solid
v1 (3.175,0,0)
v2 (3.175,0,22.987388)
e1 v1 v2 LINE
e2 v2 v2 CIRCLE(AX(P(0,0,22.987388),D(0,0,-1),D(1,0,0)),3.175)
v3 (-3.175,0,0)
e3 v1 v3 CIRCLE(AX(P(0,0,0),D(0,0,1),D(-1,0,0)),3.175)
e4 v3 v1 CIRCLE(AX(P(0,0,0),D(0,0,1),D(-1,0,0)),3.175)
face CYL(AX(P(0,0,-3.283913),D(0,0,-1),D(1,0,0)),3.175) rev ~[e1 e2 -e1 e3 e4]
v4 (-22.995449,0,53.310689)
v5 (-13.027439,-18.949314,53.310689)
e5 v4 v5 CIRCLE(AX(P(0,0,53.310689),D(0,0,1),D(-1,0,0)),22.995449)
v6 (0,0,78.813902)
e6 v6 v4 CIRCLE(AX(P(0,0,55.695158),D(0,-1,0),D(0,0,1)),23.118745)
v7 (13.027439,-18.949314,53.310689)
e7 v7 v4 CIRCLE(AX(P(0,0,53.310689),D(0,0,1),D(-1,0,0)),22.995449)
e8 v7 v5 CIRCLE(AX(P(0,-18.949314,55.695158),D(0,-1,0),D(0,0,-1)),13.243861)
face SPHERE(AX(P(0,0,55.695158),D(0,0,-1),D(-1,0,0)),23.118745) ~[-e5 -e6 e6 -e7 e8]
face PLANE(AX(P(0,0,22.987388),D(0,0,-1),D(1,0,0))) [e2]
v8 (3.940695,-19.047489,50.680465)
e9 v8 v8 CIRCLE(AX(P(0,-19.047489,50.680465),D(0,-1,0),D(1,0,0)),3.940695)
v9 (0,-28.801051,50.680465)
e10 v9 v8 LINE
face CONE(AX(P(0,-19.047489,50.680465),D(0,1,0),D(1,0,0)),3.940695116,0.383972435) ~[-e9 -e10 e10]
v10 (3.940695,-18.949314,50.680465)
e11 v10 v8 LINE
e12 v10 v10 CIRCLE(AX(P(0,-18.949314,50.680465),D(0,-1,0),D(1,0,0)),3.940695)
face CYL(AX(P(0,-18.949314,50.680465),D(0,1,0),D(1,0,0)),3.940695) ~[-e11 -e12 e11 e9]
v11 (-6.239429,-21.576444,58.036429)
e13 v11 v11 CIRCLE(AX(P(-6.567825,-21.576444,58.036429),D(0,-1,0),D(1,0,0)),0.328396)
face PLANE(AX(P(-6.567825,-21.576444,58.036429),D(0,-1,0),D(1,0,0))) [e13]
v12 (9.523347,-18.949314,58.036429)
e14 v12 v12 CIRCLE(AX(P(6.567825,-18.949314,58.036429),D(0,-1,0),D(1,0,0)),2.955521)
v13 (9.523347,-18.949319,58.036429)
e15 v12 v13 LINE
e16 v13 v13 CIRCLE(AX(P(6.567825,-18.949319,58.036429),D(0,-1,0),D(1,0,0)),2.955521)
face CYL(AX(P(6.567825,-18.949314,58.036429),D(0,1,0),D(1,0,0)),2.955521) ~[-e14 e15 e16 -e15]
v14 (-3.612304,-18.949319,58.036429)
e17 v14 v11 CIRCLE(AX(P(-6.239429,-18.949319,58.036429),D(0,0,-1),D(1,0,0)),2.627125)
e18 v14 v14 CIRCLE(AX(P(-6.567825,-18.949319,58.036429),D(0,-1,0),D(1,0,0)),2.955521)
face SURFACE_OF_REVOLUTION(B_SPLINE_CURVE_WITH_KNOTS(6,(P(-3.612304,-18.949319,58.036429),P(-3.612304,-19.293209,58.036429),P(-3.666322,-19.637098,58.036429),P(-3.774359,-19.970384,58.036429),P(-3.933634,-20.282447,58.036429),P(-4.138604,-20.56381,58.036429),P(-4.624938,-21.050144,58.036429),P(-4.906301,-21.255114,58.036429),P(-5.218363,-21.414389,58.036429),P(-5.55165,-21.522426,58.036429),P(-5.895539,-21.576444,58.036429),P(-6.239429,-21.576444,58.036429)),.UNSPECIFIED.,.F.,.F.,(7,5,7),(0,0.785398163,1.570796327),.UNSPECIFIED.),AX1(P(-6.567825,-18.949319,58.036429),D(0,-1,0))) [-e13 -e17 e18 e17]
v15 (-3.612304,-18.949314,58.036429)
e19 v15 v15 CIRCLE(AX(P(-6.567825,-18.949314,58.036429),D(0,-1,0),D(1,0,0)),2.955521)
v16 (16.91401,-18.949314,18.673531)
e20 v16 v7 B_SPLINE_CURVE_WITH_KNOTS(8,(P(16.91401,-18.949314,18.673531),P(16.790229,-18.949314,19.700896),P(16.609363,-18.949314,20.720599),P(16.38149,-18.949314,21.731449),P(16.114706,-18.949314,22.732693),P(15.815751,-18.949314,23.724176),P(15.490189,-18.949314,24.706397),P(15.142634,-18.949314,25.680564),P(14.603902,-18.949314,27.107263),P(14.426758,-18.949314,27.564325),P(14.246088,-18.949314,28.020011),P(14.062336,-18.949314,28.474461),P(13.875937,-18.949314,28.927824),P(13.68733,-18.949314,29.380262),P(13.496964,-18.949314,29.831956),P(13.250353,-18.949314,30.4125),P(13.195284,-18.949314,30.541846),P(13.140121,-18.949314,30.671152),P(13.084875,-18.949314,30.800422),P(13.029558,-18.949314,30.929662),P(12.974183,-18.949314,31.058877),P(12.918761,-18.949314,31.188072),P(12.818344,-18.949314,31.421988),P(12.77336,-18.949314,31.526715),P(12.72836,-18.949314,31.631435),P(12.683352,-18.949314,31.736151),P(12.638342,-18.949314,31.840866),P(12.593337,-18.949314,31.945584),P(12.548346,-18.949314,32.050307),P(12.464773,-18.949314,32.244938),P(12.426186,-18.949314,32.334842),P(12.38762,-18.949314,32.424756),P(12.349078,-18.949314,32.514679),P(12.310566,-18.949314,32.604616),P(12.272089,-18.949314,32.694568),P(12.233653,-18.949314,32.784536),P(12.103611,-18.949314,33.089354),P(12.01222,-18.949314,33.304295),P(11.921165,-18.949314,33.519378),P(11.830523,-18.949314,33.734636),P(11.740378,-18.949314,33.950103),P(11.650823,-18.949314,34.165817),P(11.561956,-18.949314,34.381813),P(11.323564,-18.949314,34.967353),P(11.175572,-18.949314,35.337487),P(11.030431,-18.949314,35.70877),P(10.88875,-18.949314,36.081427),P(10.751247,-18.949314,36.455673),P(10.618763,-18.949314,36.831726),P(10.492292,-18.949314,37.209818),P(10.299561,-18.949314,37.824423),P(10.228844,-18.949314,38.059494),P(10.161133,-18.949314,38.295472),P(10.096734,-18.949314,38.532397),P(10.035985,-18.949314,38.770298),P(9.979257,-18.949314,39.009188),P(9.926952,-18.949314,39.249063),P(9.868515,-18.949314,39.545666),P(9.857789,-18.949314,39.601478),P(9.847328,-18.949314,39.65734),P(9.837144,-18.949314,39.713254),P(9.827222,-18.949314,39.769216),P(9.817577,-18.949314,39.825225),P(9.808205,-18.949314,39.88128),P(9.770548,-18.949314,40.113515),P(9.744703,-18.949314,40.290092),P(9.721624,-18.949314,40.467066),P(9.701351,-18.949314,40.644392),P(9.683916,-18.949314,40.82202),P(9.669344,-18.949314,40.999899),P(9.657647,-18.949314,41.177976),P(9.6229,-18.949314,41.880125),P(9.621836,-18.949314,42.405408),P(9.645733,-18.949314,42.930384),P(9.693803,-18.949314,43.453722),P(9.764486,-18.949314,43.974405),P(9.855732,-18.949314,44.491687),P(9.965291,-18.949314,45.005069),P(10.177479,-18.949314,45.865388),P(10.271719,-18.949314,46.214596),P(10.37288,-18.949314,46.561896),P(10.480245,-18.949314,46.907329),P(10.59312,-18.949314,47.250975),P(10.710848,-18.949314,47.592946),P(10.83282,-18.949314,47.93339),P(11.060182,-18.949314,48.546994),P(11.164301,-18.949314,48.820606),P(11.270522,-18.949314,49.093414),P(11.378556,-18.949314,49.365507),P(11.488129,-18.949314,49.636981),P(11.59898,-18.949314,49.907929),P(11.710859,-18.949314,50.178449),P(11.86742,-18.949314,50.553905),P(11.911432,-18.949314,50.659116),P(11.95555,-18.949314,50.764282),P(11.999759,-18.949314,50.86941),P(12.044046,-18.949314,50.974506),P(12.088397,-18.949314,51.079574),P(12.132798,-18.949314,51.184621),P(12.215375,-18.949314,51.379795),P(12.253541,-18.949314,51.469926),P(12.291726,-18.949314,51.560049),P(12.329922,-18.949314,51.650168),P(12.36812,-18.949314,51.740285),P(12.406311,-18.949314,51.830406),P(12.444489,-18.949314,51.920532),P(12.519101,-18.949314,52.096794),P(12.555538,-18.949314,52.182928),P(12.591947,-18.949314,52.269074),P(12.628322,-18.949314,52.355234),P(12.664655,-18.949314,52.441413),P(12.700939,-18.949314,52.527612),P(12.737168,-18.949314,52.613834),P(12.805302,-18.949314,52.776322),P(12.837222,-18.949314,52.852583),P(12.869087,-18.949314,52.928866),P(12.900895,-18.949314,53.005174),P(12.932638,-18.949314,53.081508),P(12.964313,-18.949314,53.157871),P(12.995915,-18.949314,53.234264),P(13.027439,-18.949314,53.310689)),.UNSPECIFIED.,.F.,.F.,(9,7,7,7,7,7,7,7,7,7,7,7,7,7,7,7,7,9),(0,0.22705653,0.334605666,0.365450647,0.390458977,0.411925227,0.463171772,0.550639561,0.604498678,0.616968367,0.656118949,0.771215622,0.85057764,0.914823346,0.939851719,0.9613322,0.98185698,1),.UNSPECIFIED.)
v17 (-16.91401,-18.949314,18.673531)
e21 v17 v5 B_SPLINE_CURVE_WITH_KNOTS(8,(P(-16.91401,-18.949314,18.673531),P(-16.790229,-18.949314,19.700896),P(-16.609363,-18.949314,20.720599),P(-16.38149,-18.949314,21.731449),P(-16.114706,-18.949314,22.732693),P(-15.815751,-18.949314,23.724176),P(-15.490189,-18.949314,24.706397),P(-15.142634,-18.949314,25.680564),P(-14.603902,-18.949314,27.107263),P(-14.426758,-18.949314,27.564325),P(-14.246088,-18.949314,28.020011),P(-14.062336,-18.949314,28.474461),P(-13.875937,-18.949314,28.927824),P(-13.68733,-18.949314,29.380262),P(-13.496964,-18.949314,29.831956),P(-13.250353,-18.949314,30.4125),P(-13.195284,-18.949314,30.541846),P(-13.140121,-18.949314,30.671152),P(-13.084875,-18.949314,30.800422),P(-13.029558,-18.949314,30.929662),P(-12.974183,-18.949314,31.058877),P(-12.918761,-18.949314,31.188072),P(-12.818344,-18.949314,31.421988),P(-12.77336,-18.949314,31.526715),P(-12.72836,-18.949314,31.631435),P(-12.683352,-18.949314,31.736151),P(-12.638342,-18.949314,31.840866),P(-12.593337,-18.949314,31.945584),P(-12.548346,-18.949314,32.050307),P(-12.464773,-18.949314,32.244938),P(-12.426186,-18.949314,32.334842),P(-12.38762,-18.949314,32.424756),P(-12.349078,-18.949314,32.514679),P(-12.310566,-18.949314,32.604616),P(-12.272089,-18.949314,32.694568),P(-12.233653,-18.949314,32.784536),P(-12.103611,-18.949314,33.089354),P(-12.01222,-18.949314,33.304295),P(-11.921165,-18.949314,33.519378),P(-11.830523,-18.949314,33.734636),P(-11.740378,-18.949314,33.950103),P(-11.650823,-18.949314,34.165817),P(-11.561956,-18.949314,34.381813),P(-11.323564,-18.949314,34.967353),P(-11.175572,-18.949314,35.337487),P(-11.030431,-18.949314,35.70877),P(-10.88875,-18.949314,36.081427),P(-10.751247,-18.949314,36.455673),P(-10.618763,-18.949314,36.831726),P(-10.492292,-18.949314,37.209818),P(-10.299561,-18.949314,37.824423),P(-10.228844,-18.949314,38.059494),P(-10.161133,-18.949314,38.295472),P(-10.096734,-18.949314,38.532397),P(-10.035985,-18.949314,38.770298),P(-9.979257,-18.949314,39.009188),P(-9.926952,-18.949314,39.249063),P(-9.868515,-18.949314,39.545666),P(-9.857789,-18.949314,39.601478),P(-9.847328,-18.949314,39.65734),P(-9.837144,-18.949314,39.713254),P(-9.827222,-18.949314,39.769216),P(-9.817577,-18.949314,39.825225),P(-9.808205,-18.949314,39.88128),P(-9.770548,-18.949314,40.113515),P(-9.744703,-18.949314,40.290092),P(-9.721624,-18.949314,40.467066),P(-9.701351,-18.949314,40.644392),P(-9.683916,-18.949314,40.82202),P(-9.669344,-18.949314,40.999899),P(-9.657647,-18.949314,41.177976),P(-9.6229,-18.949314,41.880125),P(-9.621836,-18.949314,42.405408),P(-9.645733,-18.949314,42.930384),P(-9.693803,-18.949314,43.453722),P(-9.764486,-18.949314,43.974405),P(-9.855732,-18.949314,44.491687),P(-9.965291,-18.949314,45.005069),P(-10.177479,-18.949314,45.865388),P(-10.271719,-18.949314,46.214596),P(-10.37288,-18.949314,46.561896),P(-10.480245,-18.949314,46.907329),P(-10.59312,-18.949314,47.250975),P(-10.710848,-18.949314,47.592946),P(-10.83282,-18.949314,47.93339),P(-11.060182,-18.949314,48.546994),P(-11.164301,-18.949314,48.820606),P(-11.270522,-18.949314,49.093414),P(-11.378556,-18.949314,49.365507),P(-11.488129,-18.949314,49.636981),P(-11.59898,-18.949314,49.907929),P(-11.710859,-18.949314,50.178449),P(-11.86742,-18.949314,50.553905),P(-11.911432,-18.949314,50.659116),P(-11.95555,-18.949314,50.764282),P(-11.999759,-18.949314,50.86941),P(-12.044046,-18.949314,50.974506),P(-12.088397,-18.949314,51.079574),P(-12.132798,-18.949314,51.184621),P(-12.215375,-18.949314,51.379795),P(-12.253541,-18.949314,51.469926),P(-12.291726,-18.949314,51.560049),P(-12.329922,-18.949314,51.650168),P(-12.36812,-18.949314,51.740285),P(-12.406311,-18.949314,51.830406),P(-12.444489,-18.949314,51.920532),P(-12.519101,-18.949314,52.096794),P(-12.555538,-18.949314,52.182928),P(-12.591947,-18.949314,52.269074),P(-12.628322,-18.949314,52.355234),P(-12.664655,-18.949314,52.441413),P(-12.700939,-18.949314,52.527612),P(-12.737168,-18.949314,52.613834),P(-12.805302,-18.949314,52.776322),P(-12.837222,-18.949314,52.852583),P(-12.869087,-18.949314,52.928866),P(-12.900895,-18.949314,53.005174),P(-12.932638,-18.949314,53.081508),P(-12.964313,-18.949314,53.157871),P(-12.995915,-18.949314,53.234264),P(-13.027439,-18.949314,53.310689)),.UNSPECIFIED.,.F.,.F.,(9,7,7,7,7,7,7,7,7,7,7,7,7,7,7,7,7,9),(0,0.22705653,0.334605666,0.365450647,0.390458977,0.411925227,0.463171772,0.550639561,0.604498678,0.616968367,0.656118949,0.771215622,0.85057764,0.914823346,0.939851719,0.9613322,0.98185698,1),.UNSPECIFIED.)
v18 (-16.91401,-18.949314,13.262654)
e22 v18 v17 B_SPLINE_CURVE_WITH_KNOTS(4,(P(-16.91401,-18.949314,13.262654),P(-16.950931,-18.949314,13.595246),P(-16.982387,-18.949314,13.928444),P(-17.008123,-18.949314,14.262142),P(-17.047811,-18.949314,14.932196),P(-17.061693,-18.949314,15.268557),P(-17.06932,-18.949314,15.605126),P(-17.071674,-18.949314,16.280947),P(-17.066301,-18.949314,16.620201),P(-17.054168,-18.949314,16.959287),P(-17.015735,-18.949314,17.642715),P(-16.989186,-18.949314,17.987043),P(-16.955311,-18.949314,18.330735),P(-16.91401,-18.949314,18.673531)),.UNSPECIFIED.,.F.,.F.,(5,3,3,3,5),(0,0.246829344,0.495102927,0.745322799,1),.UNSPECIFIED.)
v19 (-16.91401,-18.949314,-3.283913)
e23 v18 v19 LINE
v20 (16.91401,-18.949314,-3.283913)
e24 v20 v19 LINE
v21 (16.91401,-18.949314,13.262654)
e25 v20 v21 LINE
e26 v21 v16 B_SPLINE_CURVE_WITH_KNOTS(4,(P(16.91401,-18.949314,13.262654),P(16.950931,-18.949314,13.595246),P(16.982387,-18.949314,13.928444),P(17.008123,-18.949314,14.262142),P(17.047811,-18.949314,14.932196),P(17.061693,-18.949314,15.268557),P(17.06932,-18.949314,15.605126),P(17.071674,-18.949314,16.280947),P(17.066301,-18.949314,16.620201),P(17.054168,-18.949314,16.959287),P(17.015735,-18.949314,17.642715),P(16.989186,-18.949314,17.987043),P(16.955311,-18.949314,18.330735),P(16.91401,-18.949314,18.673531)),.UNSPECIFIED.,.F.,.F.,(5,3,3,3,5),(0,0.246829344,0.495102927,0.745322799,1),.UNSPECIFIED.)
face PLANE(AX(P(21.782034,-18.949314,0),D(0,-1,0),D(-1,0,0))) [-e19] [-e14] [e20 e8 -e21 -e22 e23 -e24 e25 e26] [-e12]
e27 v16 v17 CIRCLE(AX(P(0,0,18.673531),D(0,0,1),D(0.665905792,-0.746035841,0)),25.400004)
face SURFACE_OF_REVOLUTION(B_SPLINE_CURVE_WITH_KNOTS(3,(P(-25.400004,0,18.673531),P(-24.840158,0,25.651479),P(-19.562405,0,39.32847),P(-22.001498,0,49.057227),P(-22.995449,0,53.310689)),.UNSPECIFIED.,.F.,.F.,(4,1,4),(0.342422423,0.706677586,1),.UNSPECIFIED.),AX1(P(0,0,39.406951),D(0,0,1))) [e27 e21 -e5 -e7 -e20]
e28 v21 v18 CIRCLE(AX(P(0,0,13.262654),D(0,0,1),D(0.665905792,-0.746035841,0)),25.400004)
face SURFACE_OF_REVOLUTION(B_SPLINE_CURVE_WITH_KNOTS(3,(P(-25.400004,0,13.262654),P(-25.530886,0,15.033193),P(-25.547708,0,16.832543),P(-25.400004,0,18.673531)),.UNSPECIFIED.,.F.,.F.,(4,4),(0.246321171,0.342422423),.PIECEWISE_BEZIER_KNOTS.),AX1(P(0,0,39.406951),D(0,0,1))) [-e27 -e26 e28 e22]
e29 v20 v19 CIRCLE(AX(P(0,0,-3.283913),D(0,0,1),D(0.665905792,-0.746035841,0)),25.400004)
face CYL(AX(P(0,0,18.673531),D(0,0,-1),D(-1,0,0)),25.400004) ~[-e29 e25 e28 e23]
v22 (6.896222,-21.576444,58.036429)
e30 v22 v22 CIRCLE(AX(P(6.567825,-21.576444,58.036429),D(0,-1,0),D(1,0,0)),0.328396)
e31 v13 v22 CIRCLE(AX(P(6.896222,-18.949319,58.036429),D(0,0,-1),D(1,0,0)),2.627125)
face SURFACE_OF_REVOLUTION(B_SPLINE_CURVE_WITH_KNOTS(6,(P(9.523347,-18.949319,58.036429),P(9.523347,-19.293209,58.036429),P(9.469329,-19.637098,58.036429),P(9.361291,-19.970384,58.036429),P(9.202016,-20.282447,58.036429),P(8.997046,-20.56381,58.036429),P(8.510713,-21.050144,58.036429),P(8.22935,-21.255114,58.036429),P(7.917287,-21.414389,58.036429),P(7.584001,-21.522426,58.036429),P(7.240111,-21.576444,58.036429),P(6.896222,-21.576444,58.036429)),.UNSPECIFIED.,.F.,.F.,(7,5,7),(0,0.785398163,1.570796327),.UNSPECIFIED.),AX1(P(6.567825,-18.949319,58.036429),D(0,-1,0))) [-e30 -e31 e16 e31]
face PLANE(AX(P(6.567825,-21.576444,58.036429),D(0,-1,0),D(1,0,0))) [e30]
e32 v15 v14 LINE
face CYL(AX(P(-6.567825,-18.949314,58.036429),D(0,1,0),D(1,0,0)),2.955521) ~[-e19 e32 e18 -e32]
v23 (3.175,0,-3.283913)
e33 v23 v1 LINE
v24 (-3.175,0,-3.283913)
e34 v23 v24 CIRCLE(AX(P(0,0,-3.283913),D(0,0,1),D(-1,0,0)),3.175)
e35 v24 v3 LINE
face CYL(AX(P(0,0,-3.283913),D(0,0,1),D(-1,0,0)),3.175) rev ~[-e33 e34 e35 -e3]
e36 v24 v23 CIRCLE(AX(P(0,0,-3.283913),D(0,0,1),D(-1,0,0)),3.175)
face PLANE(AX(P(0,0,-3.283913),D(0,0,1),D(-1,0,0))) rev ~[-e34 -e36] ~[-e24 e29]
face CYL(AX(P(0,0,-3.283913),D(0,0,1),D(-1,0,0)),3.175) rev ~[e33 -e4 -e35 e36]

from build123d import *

# Parameters (mm, degrees)
F3_DEPTH      = 177.8
F3_DEPTH_BACK = 12.7
F4_R          = 7.62
F5_DEPTH      = 19.05
F6_SIZE2      = 18.860161823
F6_SIZE       = 7.62
F4_R_2        = 5.715
F7_DEPTH      = 5.08
F8_R          = 5.07999
F9_R          = 6.139399456
F10_DEPTH     = 50.8
F11_SCALE     = 0.51715159


# Not quite as in the source:
# - a fillet or chamfer is up to 0.001 mm smaller than in the source, because OpenCascade refuses the exact size


with BuildPart() as f1:
    # F0 (on Front) → F1 (revolve)
    with BuildSketch(Plane.XZ):
        with BuildLine():
            Line((-6.139399456, 0), (0, 0))
            Line((0, 0), (0, 146.0500033258))
            Line((0, 146.0500033258), (0, 152.4))
            ThreePointArc((0, 152.4), (-33.2006597867, 137.6319951518), (-44.4655865431, 103.0852268133))
            add(Edge.make_bspline(
                [(-49.1152013464, 36.1084283333), (-48.0326439436, 49.6014705241), (-37.8272166921, 76.0482431769), (-42.543614325, 94.8604386904), (-44.4655865431, 103.0852268133)],
                knots=[0.3424224234, 0.3424224234, 0.3424224234, 0.3424224234, 0.7066775859, 1, 1, 1, 1], degree=3))
            Line((-49.1152013464, 36.1084283333), (-49.1152013464, 25.6455829718))
            add(Edge.make_bspline(
                [(-44.4655865431, 0), (-46.3688797408, 8.4610342592), (-48.4665187415, 16.8703142107), (-49.1152013464, 25.6455829718)],
                knots=[0, 0, 0, 0, 0.246321171, 0.246321171, 0.246321171, 0.246321171], degree=3))
            Line((-44.4655865431, 0), (-38.2711647941, 0))
            Line((-38.2711647941, 0), (-6.139399456, 0))
        make_face()
        Polygon((-6.139399456, -6.35), (-6.139399456, 0), (-38.2711647941, 0), (-44.4655865431, 0), (-44.4655865431, -6.35), align=None)
        with BuildLine():
            Line((-44.4655865431, -6.35), (-44.4655865431, 0))
            add(Edge.make_bspline(
                [(-44.4655865431, 0), (-46.3688797408, 8.4610342592), (-48.4665187415, 16.8703142107), (-49.1152013464, 25.6455829718)],
                knots=[0, 0, 0, 0, 0.246321171, 0.246321171, 0.246321171, 0.246321171], degree=3))
            Line((-49.1152013464, 25.6455829718), (-49.1152013464, 0))
            Line((-49.1152013464, 0), (-49.1152013464, -6.35))
            Line((-49.1152013464, -6.35), (-44.4655865431, -6.35))
        make_face()
        with BuildLine():
            add(Edge.make_bspline(
                [(-49.1152013464, 25.6455829718), (-49.3682823563, 29.0692201465), (-49.4008119098, 32.5485659437), (-49.1152013464, 36.1084283333)],
                knots=[0.246321171, 0.246321171, 0.246321171, 0.246321171, 0.3424224234, 0.3424224234, 0.3424224234, 0.3424224234], degree=3))
            Line((-49.1152013464, 25.6455829718), (-49.1152013464, 36.1084283333))
        make_face()
    revolve(axis=Axis((0, 0, 76.2), (0, 0, 1)))

    # F2 (on Top) → F3 (cut, two sides)
    with BuildSketch(Plane.XY) as f3_sk:
        Polygon((25.6092443837, -36.641700535), (-25.1907556163, -36.641700535), (-46.7807556163, -36.641700535), (-46.7807556163, -67.121700535), (42.1192443837, -67.121700535), (42.1192443837, -36.641700535), align=None)
    extrude(amount=F3_DEPTH, mode=Mode.SUBTRACT)
    extrude(f3_sk.sketch, amount=-F3_DEPTH_BACK, mode=Mode.SUBTRACT)

    # F4 (on face) → F5 (join)
    with BuildSketch(Plane.XZ.offset(36.641700535)):
        with Locations((0, 97.9992443837)):
            Circle(F4_R)
    extrude(amount=F5_DEPTH)

    # F6
    f6_edges = [f1.edges().sort_by_distance(p)[0] for p in [
        (-7.62, -55.691701, 97.999244),
    ]]
    f6_side = f1.faces().sort_by_distance((0, -55.691701, 97.999244))[0]
    chamfer(f6_edges, length=F6_SIZE, length2=F6_SIZE2, reference=f6_side)

    # F4 (on face) → F7 (join)
    with BuildSketch(Plane.XZ.offset(36.641700535)):
        with Locations((-12.7, 112.2232443837)):
            Circle(F4_R_2)
        with Locations((12.7, 112.2232443837)):
            Circle(F4_R_2)
    extrude(amount=F7_DEPTH)

    # F8 (radius 5.08 in the source; OpenCascade refuses exactly that, so slightly less here)
    f8_edges = [f1.edges().sort_by_distance(p)[0] for p in [
        (-18.415, -41.721701, 112.223244),
        (6.985, -41.721701, 112.223244),
    ]]
    fillet(f8_edges, radius=F8_R)

    # F9 (on face) → F10 (cut)
    with BuildSketch(Plane(origin=(0, 0, -6.35), x_dir=(1, 0, 0), z_dir=(0, 0, -1))):
        Circle(F9_R)
    extrude(amount=-F10_DEPTH, mode=Mode.SUBTRACT)


with BuildPart() as f1_1:
    # F11: moved
    add(f1.part.scale(F11_SCALE))


solid = f1_1.part
